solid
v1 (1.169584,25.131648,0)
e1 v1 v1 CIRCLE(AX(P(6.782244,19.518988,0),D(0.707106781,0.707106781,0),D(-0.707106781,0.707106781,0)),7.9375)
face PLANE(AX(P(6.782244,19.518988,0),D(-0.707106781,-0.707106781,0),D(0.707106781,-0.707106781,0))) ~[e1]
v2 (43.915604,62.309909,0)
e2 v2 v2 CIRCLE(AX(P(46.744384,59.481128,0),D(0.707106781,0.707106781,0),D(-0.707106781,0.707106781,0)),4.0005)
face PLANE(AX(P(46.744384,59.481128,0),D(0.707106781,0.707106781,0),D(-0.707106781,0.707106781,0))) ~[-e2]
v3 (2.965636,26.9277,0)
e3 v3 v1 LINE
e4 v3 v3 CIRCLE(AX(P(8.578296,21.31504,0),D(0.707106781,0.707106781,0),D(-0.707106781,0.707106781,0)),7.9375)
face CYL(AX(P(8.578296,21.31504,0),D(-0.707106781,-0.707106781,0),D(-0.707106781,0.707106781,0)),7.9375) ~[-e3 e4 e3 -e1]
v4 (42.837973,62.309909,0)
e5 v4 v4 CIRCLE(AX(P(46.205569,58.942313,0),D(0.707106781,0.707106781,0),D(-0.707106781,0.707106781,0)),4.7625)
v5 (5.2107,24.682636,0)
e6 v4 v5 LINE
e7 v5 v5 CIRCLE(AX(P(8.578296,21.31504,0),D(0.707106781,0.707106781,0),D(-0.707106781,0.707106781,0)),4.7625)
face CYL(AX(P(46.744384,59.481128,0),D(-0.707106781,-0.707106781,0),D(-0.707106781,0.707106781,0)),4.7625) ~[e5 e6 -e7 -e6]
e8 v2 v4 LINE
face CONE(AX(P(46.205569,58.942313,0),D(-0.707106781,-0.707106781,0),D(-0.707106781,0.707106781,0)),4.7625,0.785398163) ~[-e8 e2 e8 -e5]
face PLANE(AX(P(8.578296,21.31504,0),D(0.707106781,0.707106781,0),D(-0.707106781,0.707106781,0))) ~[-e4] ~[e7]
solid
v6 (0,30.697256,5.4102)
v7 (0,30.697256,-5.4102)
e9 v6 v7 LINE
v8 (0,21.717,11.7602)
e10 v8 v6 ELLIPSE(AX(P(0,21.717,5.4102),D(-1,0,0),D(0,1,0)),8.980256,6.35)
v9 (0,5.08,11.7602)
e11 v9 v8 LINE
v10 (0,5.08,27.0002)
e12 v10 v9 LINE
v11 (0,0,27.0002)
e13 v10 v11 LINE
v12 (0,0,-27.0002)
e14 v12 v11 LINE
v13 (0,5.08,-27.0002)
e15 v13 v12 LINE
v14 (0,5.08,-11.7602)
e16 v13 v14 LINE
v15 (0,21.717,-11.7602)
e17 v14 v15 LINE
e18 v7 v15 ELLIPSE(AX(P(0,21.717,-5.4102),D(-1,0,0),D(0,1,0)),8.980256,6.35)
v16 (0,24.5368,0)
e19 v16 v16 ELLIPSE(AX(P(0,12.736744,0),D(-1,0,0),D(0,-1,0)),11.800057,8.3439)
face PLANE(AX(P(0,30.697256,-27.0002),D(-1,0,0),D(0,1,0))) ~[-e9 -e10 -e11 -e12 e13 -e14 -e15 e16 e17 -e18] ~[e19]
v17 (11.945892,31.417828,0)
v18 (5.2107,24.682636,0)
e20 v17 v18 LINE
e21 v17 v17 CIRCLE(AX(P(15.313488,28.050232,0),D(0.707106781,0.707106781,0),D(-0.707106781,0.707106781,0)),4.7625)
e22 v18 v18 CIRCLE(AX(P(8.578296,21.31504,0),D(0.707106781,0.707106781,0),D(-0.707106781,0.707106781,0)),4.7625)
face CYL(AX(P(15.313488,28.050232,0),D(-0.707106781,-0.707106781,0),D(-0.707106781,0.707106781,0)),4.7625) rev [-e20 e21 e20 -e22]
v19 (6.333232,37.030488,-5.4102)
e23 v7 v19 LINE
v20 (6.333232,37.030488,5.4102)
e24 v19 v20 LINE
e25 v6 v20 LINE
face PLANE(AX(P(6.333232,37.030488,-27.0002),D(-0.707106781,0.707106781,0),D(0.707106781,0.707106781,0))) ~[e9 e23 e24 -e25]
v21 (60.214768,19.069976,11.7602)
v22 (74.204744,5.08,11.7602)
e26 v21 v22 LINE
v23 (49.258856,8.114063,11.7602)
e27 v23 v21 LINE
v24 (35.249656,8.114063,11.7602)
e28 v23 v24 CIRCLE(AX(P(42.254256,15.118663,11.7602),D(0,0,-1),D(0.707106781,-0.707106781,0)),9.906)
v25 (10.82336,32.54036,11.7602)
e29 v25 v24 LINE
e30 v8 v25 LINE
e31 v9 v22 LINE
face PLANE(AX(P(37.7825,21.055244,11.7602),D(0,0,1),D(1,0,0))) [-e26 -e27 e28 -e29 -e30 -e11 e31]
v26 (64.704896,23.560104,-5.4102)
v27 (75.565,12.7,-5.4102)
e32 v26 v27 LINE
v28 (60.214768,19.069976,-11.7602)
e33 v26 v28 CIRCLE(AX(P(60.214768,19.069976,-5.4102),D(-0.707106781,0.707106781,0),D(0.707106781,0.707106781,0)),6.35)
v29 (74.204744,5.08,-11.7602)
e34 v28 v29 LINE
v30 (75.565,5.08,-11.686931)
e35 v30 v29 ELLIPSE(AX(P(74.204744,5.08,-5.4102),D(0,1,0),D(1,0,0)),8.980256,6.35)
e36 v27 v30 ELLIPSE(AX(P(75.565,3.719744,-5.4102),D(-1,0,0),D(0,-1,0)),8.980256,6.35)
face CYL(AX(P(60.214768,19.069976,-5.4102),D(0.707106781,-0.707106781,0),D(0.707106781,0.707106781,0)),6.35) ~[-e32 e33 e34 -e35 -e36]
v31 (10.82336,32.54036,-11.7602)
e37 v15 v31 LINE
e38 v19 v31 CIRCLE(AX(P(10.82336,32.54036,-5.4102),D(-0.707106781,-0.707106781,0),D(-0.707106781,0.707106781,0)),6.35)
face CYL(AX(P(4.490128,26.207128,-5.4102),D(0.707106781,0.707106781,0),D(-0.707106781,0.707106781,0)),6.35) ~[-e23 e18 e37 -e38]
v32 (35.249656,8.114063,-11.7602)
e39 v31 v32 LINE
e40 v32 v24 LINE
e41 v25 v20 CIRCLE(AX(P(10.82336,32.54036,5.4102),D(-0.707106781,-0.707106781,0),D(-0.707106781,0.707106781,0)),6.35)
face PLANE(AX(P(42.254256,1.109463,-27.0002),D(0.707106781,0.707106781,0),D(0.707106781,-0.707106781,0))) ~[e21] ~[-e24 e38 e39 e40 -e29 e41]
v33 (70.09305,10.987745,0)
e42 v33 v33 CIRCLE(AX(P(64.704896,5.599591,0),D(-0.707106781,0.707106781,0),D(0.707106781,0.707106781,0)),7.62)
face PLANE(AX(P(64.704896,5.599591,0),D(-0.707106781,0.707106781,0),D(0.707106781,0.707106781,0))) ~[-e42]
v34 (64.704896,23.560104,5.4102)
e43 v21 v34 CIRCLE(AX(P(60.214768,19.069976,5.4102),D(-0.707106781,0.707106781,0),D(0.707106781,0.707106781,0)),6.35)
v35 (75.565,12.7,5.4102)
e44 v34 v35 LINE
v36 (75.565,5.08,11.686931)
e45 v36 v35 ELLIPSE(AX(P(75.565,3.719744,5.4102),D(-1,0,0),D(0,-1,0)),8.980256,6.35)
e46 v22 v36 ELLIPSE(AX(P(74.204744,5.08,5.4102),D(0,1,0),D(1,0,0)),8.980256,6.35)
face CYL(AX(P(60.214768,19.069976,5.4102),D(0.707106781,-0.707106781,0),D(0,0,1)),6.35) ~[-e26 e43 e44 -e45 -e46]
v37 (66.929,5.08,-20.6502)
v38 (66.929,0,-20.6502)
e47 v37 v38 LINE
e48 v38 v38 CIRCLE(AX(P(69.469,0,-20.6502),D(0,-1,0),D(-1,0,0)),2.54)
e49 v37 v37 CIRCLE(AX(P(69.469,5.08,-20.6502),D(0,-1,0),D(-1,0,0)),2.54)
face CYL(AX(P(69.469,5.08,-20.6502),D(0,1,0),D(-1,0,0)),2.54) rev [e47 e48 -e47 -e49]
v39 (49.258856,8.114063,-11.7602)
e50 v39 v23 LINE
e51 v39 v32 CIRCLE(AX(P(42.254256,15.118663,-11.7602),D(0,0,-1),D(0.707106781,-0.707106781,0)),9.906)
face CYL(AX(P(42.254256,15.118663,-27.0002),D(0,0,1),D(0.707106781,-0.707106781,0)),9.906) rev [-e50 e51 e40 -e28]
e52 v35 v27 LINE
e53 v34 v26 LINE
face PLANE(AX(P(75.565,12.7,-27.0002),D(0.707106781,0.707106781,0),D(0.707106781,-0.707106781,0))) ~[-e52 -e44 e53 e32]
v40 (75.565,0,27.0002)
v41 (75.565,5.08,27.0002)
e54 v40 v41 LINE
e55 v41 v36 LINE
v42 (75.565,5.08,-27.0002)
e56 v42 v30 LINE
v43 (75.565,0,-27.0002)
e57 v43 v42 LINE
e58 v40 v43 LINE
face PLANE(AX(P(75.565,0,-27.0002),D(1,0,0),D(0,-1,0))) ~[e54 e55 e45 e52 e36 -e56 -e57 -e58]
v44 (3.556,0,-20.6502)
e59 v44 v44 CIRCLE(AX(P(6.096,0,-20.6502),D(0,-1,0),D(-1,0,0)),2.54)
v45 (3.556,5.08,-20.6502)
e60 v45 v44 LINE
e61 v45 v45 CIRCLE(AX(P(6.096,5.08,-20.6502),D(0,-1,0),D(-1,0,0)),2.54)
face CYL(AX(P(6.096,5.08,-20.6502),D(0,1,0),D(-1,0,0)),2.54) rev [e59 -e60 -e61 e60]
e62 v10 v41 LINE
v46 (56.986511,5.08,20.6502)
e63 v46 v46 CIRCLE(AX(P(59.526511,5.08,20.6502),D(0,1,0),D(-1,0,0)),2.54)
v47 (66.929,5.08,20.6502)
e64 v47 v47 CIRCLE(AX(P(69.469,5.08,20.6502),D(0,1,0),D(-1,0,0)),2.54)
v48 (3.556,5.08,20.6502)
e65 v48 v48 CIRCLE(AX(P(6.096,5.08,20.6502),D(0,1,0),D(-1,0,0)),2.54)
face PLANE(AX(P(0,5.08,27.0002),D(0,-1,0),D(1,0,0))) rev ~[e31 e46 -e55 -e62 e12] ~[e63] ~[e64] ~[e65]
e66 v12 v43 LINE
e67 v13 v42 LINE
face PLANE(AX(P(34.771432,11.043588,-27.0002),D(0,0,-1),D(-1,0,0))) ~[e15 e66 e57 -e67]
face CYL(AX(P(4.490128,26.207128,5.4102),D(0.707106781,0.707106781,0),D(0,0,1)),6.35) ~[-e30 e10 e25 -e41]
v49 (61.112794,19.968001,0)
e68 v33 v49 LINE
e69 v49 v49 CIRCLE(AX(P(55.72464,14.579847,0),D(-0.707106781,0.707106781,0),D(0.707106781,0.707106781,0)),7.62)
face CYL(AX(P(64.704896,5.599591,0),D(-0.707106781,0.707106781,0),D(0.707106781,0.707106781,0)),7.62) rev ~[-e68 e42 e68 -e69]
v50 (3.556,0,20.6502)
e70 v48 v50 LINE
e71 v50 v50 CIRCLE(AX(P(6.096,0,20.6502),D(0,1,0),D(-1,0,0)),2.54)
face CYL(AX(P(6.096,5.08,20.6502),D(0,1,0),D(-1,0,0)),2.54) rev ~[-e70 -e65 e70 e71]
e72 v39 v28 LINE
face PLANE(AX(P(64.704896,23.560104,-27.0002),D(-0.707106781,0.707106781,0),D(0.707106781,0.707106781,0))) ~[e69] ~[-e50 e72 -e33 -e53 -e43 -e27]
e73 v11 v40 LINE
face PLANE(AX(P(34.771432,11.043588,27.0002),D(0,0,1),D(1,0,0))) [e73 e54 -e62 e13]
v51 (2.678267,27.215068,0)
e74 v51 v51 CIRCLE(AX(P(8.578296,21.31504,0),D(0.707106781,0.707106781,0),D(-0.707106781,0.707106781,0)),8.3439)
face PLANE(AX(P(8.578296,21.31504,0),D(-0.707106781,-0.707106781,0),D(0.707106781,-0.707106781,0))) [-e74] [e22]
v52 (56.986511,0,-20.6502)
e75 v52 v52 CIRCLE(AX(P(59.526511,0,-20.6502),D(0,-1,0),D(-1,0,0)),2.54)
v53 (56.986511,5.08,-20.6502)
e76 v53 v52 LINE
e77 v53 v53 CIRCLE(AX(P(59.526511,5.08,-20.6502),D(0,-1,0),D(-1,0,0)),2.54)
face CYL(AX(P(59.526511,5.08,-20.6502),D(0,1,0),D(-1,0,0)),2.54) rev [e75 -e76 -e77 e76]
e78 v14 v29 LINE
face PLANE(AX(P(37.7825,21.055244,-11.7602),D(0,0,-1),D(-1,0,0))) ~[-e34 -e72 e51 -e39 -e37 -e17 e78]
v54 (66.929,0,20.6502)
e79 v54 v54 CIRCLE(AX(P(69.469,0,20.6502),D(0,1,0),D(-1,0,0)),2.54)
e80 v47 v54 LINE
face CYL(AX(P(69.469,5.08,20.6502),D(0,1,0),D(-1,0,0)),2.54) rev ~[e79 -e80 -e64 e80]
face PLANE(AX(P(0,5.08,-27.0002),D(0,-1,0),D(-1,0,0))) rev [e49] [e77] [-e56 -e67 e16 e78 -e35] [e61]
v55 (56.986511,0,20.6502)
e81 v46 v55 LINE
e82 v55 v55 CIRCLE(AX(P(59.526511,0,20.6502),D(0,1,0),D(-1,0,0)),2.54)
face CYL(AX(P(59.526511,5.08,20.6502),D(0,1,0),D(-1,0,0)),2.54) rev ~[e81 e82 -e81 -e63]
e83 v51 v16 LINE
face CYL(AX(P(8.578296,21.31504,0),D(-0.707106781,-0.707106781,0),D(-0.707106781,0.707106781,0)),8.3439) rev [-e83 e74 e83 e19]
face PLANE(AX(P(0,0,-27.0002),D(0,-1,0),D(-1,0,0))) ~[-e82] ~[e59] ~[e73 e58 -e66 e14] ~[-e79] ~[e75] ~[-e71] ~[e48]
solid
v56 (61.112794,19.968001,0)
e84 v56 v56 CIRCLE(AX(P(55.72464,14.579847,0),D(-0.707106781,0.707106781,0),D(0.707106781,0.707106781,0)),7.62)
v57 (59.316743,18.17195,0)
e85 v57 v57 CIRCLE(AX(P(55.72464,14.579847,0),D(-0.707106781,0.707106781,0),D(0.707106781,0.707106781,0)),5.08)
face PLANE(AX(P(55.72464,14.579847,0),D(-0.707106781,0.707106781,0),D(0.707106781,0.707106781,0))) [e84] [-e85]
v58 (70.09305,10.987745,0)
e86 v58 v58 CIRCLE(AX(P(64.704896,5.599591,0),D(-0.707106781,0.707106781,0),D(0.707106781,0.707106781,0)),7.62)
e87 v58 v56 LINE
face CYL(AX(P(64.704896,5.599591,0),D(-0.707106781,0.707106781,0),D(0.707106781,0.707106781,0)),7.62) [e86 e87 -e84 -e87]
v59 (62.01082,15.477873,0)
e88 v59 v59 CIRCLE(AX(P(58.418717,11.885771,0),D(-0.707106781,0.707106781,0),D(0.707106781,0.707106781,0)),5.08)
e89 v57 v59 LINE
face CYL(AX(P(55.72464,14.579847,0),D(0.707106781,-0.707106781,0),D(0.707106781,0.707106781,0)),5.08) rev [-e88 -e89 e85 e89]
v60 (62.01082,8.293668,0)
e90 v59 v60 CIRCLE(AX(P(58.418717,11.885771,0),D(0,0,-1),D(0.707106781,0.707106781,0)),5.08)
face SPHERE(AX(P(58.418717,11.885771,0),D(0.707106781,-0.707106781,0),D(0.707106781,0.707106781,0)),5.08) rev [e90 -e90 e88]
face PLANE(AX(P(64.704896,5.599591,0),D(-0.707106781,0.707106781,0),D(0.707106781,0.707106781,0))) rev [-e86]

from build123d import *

# Parameters (mm, degrees)
F1_DEPTH = 27.0002
F2_R     = 9.906
F3_W     = 75.565
F3_H     = 31.9504877579
F4_DEPTH = 15.24
F5_R     = 2.54
F6_DEPTH = 5.081
F8_R     = 6.35
F14_SIZE = 0.762


with BuildPart() as f1:
    # F0 (on Top) → F1 (new body)
    with BuildSketch(Plane.XY):
        Polygon((64.7048964237, 23.5601035763), (42.2542561211, 1.1094632736), (6.3332316368, 37.0304877579), (0, 30.6972561211), (0, 0), (75.565, 0), (75.565, 12.7), align=None)
    extrude(amount=-F1_DEPTH)

    # F2
    f2_edges = [f1.edges().sort_by_distance(p)[0] for p in [
        (42.254256, 1.109463, -13.5001),
    ]]
    fillet(f2_edges, radius=F2_R)

    # F3 (on Top) → F4 (cut)
    with BuildSketch(Plane.XY):
        with Locations((37.7825, 21.0552438789)):
            Rectangle(F3_W, F3_H)
    extrude(amount=-F4_DEPTH, mode=Mode.SUBTRACT)

    # F5 (on face) → F6 (cut, through all)
    with BuildSketch(Plane(origin=(0, 5.08, 0), x_dir=(-1, 0, 0), z_dir=(0, 1, 0))):
        with Locations((-69.469, -6.35)):
            Circle(F5_R)
        with Locations((-59.5265105367, -6.35)):
            Circle(F5_R)
        with Locations((-6.096, -6.35)):
            Circle(F5_R)
    extrude(amount=-F6_DEPTH, mode=Mode.SUBTRACT)

    # F7: F1 across face


with BuildPart() as f1_1:
    add(f1.part)
    add(f1.part.mirror(Plane(origin=(31.4297936493, 11.6265989231, -27.0002), x_dir=(1, 0, 0), z_dir=(0, 0, -1))))

    # F8
    f8_edges = [f1_1.edges().sort_by_distance(p)[0] for p in [
        (70.134948, 18.130052, -38.7604),
        (70.134948, 18.130052, -15.24),
        (3.166616, 33.863872, -38.7604),
        (3.166616, 33.863872, -15.24),
    ]]
    fillet(f8_edges, radius=F8_R)


with BuildPart() as f1_2:
    # F10: moved
    add(f1_1.part.moved(Location((0, 0, 27.0002))))

    # F9 (on Top) → F11 (revolve, cut)
    with BuildSketch(Plane.XY):
        Polygon((-6.3683719395, 6.3683719395), (15.3134877579, 28.0502316368), (11.9458917125, 31.4178276822), (5.2106996217, 24.6826355914), (2.6782673955, 27.2150678175), (-12.268400211, 12.268400211), align=None)
    revolve(axis=Axis((22.0486798487, 34.7854237276, 0), (0.7071067812, 0.7071067812, 0)), mode=Mode.SUBTRACT)

    # F15 (on Top) → F16 (revolve, cut)
    with BuildSketch(Plane.XY):
        Polygon((64.7048964237, 5.5995913341), (70.0930500964, 10.9877450068), (61.1127939753, 19.9680011278), (55.7246403027, 14.5798474552), align=None)
    revolve(axis=Axis((60.2147683632, 10.0897193947, 0), (-0.7071067812, 0.7071067812, 0)), mode=Mode.SUBTRACT)


with BuildPart() as f13:
    # F12 (on Top) → F13 (revolve)
    with BuildSketch(Plane.XY):
        Polygon((5.2106996217, 24.6826355914), (2.9656355914, 26.9276996217), (1.1695843672, 25.1316483974), (6.7822444428, 19.5189883218), (46.7443841816, 59.4811280605), (43.3767881362, 62.8487241059), (11.9458917125, 31.4178276822), align=None)
    revolve(axis=Axis((26.7633143122, 39.5000581912, 0), (0.7071067812, 0.7071067812, 0)))

    # F14
    f14_edges = [f13.edges().sort_by_distance(p)[0] for p in [
        (50.11198, 56.113532, 0),
    ]]
    chamfer(f14_edges, length=F14_SIZE)


with BuildPart() as f19:
    # F18 (on Top) → F19 (revolve)
    with BuildSketch(Plane.XY):
        with BuildLine():
            Line((62.0108195874, 8.2936681704), (64.7048964237, 5.5995913341))
            Line((64.7048964237, 5.5995913341), (70.0930500964, 10.9877450068))
            Line((70.0930500964, 10.9877450068), (61.1127939753, 19.9680011278))
            Line((61.1127939753, 19.9680011278), (60.2147683632, 19.0699755157))
            Line((60.2147683632, 19.0699755157), (59.3167427511, 18.1719499036))
            Line((59.3167427511, 18.1719499036), (62.0108195874, 15.4778730673))
            ThreePointArc((62.0108195874, 15.4778730673), (63.498717139, 11.8857706189), (62.0108195874, 8.2936681704))
        make_face()
    revolve(axis=Axis((40.0091920908, 30.2952956671, 0), (-0.7071067812, 0.7071067812, 0)))


solid = Compound([f1_2.part, f13.part, f19.part])
